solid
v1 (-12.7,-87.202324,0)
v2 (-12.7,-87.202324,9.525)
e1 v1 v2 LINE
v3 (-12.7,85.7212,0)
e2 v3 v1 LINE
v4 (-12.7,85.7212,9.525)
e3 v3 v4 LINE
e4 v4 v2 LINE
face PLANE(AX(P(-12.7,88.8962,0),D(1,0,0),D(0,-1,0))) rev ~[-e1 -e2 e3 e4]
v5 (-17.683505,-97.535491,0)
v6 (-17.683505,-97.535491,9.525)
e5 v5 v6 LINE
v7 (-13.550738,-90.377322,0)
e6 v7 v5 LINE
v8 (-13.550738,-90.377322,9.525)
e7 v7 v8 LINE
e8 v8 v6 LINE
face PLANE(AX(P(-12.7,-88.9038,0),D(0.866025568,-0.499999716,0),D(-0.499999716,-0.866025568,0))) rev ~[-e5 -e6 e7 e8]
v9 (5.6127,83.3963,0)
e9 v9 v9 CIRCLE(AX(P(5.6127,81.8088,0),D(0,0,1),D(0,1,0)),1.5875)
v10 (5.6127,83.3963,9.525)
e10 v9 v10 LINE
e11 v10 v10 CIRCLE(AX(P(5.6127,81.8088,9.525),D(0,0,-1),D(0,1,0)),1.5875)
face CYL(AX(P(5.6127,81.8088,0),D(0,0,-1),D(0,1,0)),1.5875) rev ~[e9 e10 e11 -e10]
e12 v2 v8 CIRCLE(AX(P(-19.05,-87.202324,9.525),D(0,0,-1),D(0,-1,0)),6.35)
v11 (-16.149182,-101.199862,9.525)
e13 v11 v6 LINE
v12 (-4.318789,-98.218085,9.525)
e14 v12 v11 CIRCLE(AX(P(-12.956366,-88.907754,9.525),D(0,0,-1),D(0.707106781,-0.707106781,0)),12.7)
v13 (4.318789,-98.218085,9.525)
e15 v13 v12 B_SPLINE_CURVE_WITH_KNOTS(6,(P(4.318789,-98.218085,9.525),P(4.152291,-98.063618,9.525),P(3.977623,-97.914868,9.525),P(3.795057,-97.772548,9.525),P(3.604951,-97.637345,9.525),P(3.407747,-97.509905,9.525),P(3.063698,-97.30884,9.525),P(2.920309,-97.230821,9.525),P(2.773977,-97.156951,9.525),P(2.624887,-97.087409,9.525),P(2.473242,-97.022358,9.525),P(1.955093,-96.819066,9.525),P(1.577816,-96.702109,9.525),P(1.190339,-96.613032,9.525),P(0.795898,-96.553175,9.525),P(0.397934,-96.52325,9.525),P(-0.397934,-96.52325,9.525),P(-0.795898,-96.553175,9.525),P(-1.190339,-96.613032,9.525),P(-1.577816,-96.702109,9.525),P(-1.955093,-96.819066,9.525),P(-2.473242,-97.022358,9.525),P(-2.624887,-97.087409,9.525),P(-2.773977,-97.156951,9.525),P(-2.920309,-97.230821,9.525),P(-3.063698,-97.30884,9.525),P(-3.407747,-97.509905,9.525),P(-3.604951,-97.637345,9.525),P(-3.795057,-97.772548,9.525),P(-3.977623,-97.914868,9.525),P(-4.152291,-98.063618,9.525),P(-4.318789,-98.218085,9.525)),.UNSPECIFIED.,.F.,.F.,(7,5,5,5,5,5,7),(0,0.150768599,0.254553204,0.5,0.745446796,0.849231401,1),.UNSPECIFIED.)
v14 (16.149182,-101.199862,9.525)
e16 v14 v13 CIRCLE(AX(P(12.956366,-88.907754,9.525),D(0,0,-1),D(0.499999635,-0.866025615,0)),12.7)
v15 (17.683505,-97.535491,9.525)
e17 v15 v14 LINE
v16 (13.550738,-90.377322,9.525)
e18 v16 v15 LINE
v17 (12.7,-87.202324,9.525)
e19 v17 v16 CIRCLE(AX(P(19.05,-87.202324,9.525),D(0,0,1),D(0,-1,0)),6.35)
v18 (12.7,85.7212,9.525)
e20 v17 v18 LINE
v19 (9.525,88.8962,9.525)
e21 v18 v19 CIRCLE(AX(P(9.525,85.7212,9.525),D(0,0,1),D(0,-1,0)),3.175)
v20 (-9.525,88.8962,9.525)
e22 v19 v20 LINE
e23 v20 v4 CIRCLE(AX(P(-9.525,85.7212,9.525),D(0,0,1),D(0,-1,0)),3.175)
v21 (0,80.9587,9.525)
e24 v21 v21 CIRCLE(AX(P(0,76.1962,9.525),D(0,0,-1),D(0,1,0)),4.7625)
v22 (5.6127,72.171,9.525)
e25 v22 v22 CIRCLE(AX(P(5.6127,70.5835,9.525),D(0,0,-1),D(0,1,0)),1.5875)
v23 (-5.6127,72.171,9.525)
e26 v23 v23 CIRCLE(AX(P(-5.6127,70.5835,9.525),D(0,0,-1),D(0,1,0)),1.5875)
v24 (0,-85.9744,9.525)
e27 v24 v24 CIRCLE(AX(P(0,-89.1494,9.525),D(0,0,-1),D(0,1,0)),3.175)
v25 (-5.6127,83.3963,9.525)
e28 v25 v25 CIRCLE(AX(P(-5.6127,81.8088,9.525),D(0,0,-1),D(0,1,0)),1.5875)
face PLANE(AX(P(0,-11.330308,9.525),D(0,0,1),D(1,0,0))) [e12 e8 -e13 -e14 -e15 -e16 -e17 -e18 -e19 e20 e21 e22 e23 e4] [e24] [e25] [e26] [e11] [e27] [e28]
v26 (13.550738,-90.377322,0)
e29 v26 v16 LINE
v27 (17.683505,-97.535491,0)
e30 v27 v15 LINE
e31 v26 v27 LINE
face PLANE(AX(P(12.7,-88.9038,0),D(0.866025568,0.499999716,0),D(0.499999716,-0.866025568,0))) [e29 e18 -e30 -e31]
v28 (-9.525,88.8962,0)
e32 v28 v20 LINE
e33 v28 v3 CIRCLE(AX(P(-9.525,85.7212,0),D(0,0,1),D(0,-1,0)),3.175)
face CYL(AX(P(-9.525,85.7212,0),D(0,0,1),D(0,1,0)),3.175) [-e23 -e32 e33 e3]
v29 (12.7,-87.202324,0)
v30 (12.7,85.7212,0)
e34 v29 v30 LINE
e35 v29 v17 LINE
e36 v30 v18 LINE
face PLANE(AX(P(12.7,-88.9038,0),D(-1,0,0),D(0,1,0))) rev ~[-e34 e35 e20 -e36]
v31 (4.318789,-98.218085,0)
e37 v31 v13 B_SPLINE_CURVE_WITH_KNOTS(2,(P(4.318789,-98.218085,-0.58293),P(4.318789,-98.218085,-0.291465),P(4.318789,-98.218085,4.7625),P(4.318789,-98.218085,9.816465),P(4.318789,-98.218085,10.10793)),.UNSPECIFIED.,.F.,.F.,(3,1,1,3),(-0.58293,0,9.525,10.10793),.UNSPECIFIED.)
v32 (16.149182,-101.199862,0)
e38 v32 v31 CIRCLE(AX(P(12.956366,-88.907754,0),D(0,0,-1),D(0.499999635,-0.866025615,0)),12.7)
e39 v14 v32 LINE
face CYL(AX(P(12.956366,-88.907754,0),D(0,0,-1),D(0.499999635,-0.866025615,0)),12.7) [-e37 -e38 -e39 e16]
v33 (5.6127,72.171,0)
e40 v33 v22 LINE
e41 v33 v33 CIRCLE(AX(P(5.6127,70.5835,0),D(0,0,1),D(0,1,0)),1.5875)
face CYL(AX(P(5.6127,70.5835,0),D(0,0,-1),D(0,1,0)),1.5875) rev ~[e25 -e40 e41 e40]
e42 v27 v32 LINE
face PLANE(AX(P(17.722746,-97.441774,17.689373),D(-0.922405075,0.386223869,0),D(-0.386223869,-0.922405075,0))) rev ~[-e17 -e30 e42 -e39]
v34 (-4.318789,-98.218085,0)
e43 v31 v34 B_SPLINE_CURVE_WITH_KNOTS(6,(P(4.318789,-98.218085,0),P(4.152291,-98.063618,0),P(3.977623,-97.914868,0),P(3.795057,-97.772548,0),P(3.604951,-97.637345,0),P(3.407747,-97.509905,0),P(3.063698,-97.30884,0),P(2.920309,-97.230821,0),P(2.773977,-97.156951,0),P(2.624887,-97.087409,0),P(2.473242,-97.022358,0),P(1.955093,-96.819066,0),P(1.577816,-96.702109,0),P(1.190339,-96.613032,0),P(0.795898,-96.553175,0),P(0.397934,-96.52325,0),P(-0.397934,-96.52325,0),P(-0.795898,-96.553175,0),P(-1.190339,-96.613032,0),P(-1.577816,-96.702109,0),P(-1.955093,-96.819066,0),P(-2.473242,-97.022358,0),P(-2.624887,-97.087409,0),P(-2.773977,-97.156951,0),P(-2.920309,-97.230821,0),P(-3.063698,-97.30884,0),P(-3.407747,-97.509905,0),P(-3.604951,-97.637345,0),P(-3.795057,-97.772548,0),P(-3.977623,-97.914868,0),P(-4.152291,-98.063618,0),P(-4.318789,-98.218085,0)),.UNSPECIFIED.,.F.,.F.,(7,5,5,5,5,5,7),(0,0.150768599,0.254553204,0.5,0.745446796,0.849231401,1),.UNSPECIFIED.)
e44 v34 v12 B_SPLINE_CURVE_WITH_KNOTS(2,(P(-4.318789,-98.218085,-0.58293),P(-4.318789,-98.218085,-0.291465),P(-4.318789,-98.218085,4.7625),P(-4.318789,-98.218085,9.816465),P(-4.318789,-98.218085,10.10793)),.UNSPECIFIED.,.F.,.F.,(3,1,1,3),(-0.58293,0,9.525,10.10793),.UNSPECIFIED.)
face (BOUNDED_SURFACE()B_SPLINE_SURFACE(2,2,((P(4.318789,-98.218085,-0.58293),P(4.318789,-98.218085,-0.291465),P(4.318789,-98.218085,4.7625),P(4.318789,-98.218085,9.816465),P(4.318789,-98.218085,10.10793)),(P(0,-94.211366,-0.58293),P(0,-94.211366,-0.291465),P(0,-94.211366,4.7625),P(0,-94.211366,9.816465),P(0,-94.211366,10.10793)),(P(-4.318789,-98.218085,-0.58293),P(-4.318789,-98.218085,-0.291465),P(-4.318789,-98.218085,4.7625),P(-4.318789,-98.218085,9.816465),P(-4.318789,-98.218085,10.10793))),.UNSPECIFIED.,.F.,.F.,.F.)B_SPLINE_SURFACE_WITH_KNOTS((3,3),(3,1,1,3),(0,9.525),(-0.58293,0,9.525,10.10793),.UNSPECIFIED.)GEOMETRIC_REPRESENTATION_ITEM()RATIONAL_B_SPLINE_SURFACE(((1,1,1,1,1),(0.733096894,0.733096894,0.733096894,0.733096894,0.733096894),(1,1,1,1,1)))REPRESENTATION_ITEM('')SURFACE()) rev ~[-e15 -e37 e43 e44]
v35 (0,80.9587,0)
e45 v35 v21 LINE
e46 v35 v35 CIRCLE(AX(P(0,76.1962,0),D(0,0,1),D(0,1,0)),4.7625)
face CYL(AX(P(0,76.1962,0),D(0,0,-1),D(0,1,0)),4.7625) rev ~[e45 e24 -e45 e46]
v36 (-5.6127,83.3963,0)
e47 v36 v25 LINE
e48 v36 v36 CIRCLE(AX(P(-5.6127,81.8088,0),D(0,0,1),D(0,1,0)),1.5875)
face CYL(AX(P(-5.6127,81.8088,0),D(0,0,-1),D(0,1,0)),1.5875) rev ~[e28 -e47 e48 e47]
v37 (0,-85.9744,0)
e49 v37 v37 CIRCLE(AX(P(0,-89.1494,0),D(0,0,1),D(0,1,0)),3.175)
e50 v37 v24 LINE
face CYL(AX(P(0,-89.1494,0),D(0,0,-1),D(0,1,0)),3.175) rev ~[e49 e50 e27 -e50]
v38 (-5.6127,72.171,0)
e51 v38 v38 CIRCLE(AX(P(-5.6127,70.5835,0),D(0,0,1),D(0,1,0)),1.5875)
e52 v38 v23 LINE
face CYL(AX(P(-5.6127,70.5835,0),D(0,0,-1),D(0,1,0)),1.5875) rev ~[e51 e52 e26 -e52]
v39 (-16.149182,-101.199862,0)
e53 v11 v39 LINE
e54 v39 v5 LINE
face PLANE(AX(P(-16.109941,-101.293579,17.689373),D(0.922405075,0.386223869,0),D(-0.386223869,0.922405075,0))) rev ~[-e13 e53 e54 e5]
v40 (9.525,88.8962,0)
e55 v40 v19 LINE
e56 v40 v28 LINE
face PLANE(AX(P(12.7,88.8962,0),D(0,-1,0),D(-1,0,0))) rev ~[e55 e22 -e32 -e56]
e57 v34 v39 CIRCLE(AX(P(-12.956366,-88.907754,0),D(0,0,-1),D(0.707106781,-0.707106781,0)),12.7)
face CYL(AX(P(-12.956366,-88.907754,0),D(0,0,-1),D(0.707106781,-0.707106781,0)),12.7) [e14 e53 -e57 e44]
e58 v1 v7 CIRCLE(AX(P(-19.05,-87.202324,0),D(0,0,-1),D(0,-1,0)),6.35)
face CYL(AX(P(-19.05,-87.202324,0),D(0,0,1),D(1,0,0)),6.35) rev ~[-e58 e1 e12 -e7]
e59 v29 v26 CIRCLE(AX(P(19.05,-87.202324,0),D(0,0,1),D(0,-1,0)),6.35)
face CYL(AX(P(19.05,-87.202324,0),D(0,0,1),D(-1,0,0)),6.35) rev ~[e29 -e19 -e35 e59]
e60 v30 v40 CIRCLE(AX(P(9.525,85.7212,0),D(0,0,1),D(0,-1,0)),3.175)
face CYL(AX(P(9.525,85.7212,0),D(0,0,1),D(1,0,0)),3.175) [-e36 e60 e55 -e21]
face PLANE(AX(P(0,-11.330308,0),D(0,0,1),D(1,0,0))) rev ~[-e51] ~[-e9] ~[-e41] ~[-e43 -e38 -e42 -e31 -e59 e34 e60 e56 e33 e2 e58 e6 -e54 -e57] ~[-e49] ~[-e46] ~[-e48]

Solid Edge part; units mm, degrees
sketch "Sketch1" plane through (0, 0, 0) normal (0, 0, 1) x (1, 0, 0)
  line L0 (12.7, -88.9038) -> (12.7, 88.8962)
  line L1 (12.7, 88.8962) -> (-12.7, 88.8962)
  line L2 (-12.7, 88.8962) -> (-12.7, -88.9038)
  line L3 (-12.7, -88.9038) -> (-19.1158, -100.0163)
  line L4 (-19.1158, -100.0163) -> (-10.8669, -104.7788)
  line L5 (-10.8669, -104.7788) -> (0, -93.9119)
  line L6 (10.8669, -104.7788) -> (0, -93.9119)
  line L7 (19.1158, -100.0163) -> (10.8669, -104.7788)
  line L8 (12.7, -88.9038) -> (19.1158, -100.0163)
  dimension "D1" = 177.8
  dimension "D2" = 25.4
  dimension "D3" = 9.525
  dimension "D4" = 15.875
extrude "Protrusion1" add sketch "Sketch1" along normal blind 9.525
hole "Hole_1" at (0, 76.1962, 0) direction (0, 0, 1) diameter 9.525 end up to next
fillet "Round_1" radius 3.175 2 edges at (12.7, 88.8962, 4.7625) (-12.7, 88.8962, 4.7625)
hole "Hole_2" at (-5.6127, 70.5835, 0) direction (0, 0, 1) diameter 3.175 end up to next
hole "Hole1" at (5.6127, 70.5835, 0) direction (0, 0, 1) diameter 3.175 end up to next
hole "Hole2" at (5.6127, 81.8088, 0) direction (0, 0, 1) diameter 3.175 end up to next
hole "Hole3" at (-5.6127, 81.8088, 0) direction (0, 0, 1) diameter 3.175 end up to next
fillet "Round_2" radius 12.7 2 edges at (10.8669, -104.7788, 4.7625) (-10.8669, -104.7788, 4.7625)
hole "Hole_6" at (0, -89.1494, 0) direction (0, 0, 1) diameter 6.35 end up to next
fillet "Round_3" radius 6.35 3 edges at (0, -93.9119, 4.7625) (12.7, -88.9038, 4.7625) (-12.7, -88.9038, 4.7625)
chamfer "Chamfer_1" distance 2.54 angle 45 2 edges at (-19.1158, -100.0163, 4.7625) (19.1158, -100.0163, 4.7625)
properties part number "SPaRC 02 - 004"
